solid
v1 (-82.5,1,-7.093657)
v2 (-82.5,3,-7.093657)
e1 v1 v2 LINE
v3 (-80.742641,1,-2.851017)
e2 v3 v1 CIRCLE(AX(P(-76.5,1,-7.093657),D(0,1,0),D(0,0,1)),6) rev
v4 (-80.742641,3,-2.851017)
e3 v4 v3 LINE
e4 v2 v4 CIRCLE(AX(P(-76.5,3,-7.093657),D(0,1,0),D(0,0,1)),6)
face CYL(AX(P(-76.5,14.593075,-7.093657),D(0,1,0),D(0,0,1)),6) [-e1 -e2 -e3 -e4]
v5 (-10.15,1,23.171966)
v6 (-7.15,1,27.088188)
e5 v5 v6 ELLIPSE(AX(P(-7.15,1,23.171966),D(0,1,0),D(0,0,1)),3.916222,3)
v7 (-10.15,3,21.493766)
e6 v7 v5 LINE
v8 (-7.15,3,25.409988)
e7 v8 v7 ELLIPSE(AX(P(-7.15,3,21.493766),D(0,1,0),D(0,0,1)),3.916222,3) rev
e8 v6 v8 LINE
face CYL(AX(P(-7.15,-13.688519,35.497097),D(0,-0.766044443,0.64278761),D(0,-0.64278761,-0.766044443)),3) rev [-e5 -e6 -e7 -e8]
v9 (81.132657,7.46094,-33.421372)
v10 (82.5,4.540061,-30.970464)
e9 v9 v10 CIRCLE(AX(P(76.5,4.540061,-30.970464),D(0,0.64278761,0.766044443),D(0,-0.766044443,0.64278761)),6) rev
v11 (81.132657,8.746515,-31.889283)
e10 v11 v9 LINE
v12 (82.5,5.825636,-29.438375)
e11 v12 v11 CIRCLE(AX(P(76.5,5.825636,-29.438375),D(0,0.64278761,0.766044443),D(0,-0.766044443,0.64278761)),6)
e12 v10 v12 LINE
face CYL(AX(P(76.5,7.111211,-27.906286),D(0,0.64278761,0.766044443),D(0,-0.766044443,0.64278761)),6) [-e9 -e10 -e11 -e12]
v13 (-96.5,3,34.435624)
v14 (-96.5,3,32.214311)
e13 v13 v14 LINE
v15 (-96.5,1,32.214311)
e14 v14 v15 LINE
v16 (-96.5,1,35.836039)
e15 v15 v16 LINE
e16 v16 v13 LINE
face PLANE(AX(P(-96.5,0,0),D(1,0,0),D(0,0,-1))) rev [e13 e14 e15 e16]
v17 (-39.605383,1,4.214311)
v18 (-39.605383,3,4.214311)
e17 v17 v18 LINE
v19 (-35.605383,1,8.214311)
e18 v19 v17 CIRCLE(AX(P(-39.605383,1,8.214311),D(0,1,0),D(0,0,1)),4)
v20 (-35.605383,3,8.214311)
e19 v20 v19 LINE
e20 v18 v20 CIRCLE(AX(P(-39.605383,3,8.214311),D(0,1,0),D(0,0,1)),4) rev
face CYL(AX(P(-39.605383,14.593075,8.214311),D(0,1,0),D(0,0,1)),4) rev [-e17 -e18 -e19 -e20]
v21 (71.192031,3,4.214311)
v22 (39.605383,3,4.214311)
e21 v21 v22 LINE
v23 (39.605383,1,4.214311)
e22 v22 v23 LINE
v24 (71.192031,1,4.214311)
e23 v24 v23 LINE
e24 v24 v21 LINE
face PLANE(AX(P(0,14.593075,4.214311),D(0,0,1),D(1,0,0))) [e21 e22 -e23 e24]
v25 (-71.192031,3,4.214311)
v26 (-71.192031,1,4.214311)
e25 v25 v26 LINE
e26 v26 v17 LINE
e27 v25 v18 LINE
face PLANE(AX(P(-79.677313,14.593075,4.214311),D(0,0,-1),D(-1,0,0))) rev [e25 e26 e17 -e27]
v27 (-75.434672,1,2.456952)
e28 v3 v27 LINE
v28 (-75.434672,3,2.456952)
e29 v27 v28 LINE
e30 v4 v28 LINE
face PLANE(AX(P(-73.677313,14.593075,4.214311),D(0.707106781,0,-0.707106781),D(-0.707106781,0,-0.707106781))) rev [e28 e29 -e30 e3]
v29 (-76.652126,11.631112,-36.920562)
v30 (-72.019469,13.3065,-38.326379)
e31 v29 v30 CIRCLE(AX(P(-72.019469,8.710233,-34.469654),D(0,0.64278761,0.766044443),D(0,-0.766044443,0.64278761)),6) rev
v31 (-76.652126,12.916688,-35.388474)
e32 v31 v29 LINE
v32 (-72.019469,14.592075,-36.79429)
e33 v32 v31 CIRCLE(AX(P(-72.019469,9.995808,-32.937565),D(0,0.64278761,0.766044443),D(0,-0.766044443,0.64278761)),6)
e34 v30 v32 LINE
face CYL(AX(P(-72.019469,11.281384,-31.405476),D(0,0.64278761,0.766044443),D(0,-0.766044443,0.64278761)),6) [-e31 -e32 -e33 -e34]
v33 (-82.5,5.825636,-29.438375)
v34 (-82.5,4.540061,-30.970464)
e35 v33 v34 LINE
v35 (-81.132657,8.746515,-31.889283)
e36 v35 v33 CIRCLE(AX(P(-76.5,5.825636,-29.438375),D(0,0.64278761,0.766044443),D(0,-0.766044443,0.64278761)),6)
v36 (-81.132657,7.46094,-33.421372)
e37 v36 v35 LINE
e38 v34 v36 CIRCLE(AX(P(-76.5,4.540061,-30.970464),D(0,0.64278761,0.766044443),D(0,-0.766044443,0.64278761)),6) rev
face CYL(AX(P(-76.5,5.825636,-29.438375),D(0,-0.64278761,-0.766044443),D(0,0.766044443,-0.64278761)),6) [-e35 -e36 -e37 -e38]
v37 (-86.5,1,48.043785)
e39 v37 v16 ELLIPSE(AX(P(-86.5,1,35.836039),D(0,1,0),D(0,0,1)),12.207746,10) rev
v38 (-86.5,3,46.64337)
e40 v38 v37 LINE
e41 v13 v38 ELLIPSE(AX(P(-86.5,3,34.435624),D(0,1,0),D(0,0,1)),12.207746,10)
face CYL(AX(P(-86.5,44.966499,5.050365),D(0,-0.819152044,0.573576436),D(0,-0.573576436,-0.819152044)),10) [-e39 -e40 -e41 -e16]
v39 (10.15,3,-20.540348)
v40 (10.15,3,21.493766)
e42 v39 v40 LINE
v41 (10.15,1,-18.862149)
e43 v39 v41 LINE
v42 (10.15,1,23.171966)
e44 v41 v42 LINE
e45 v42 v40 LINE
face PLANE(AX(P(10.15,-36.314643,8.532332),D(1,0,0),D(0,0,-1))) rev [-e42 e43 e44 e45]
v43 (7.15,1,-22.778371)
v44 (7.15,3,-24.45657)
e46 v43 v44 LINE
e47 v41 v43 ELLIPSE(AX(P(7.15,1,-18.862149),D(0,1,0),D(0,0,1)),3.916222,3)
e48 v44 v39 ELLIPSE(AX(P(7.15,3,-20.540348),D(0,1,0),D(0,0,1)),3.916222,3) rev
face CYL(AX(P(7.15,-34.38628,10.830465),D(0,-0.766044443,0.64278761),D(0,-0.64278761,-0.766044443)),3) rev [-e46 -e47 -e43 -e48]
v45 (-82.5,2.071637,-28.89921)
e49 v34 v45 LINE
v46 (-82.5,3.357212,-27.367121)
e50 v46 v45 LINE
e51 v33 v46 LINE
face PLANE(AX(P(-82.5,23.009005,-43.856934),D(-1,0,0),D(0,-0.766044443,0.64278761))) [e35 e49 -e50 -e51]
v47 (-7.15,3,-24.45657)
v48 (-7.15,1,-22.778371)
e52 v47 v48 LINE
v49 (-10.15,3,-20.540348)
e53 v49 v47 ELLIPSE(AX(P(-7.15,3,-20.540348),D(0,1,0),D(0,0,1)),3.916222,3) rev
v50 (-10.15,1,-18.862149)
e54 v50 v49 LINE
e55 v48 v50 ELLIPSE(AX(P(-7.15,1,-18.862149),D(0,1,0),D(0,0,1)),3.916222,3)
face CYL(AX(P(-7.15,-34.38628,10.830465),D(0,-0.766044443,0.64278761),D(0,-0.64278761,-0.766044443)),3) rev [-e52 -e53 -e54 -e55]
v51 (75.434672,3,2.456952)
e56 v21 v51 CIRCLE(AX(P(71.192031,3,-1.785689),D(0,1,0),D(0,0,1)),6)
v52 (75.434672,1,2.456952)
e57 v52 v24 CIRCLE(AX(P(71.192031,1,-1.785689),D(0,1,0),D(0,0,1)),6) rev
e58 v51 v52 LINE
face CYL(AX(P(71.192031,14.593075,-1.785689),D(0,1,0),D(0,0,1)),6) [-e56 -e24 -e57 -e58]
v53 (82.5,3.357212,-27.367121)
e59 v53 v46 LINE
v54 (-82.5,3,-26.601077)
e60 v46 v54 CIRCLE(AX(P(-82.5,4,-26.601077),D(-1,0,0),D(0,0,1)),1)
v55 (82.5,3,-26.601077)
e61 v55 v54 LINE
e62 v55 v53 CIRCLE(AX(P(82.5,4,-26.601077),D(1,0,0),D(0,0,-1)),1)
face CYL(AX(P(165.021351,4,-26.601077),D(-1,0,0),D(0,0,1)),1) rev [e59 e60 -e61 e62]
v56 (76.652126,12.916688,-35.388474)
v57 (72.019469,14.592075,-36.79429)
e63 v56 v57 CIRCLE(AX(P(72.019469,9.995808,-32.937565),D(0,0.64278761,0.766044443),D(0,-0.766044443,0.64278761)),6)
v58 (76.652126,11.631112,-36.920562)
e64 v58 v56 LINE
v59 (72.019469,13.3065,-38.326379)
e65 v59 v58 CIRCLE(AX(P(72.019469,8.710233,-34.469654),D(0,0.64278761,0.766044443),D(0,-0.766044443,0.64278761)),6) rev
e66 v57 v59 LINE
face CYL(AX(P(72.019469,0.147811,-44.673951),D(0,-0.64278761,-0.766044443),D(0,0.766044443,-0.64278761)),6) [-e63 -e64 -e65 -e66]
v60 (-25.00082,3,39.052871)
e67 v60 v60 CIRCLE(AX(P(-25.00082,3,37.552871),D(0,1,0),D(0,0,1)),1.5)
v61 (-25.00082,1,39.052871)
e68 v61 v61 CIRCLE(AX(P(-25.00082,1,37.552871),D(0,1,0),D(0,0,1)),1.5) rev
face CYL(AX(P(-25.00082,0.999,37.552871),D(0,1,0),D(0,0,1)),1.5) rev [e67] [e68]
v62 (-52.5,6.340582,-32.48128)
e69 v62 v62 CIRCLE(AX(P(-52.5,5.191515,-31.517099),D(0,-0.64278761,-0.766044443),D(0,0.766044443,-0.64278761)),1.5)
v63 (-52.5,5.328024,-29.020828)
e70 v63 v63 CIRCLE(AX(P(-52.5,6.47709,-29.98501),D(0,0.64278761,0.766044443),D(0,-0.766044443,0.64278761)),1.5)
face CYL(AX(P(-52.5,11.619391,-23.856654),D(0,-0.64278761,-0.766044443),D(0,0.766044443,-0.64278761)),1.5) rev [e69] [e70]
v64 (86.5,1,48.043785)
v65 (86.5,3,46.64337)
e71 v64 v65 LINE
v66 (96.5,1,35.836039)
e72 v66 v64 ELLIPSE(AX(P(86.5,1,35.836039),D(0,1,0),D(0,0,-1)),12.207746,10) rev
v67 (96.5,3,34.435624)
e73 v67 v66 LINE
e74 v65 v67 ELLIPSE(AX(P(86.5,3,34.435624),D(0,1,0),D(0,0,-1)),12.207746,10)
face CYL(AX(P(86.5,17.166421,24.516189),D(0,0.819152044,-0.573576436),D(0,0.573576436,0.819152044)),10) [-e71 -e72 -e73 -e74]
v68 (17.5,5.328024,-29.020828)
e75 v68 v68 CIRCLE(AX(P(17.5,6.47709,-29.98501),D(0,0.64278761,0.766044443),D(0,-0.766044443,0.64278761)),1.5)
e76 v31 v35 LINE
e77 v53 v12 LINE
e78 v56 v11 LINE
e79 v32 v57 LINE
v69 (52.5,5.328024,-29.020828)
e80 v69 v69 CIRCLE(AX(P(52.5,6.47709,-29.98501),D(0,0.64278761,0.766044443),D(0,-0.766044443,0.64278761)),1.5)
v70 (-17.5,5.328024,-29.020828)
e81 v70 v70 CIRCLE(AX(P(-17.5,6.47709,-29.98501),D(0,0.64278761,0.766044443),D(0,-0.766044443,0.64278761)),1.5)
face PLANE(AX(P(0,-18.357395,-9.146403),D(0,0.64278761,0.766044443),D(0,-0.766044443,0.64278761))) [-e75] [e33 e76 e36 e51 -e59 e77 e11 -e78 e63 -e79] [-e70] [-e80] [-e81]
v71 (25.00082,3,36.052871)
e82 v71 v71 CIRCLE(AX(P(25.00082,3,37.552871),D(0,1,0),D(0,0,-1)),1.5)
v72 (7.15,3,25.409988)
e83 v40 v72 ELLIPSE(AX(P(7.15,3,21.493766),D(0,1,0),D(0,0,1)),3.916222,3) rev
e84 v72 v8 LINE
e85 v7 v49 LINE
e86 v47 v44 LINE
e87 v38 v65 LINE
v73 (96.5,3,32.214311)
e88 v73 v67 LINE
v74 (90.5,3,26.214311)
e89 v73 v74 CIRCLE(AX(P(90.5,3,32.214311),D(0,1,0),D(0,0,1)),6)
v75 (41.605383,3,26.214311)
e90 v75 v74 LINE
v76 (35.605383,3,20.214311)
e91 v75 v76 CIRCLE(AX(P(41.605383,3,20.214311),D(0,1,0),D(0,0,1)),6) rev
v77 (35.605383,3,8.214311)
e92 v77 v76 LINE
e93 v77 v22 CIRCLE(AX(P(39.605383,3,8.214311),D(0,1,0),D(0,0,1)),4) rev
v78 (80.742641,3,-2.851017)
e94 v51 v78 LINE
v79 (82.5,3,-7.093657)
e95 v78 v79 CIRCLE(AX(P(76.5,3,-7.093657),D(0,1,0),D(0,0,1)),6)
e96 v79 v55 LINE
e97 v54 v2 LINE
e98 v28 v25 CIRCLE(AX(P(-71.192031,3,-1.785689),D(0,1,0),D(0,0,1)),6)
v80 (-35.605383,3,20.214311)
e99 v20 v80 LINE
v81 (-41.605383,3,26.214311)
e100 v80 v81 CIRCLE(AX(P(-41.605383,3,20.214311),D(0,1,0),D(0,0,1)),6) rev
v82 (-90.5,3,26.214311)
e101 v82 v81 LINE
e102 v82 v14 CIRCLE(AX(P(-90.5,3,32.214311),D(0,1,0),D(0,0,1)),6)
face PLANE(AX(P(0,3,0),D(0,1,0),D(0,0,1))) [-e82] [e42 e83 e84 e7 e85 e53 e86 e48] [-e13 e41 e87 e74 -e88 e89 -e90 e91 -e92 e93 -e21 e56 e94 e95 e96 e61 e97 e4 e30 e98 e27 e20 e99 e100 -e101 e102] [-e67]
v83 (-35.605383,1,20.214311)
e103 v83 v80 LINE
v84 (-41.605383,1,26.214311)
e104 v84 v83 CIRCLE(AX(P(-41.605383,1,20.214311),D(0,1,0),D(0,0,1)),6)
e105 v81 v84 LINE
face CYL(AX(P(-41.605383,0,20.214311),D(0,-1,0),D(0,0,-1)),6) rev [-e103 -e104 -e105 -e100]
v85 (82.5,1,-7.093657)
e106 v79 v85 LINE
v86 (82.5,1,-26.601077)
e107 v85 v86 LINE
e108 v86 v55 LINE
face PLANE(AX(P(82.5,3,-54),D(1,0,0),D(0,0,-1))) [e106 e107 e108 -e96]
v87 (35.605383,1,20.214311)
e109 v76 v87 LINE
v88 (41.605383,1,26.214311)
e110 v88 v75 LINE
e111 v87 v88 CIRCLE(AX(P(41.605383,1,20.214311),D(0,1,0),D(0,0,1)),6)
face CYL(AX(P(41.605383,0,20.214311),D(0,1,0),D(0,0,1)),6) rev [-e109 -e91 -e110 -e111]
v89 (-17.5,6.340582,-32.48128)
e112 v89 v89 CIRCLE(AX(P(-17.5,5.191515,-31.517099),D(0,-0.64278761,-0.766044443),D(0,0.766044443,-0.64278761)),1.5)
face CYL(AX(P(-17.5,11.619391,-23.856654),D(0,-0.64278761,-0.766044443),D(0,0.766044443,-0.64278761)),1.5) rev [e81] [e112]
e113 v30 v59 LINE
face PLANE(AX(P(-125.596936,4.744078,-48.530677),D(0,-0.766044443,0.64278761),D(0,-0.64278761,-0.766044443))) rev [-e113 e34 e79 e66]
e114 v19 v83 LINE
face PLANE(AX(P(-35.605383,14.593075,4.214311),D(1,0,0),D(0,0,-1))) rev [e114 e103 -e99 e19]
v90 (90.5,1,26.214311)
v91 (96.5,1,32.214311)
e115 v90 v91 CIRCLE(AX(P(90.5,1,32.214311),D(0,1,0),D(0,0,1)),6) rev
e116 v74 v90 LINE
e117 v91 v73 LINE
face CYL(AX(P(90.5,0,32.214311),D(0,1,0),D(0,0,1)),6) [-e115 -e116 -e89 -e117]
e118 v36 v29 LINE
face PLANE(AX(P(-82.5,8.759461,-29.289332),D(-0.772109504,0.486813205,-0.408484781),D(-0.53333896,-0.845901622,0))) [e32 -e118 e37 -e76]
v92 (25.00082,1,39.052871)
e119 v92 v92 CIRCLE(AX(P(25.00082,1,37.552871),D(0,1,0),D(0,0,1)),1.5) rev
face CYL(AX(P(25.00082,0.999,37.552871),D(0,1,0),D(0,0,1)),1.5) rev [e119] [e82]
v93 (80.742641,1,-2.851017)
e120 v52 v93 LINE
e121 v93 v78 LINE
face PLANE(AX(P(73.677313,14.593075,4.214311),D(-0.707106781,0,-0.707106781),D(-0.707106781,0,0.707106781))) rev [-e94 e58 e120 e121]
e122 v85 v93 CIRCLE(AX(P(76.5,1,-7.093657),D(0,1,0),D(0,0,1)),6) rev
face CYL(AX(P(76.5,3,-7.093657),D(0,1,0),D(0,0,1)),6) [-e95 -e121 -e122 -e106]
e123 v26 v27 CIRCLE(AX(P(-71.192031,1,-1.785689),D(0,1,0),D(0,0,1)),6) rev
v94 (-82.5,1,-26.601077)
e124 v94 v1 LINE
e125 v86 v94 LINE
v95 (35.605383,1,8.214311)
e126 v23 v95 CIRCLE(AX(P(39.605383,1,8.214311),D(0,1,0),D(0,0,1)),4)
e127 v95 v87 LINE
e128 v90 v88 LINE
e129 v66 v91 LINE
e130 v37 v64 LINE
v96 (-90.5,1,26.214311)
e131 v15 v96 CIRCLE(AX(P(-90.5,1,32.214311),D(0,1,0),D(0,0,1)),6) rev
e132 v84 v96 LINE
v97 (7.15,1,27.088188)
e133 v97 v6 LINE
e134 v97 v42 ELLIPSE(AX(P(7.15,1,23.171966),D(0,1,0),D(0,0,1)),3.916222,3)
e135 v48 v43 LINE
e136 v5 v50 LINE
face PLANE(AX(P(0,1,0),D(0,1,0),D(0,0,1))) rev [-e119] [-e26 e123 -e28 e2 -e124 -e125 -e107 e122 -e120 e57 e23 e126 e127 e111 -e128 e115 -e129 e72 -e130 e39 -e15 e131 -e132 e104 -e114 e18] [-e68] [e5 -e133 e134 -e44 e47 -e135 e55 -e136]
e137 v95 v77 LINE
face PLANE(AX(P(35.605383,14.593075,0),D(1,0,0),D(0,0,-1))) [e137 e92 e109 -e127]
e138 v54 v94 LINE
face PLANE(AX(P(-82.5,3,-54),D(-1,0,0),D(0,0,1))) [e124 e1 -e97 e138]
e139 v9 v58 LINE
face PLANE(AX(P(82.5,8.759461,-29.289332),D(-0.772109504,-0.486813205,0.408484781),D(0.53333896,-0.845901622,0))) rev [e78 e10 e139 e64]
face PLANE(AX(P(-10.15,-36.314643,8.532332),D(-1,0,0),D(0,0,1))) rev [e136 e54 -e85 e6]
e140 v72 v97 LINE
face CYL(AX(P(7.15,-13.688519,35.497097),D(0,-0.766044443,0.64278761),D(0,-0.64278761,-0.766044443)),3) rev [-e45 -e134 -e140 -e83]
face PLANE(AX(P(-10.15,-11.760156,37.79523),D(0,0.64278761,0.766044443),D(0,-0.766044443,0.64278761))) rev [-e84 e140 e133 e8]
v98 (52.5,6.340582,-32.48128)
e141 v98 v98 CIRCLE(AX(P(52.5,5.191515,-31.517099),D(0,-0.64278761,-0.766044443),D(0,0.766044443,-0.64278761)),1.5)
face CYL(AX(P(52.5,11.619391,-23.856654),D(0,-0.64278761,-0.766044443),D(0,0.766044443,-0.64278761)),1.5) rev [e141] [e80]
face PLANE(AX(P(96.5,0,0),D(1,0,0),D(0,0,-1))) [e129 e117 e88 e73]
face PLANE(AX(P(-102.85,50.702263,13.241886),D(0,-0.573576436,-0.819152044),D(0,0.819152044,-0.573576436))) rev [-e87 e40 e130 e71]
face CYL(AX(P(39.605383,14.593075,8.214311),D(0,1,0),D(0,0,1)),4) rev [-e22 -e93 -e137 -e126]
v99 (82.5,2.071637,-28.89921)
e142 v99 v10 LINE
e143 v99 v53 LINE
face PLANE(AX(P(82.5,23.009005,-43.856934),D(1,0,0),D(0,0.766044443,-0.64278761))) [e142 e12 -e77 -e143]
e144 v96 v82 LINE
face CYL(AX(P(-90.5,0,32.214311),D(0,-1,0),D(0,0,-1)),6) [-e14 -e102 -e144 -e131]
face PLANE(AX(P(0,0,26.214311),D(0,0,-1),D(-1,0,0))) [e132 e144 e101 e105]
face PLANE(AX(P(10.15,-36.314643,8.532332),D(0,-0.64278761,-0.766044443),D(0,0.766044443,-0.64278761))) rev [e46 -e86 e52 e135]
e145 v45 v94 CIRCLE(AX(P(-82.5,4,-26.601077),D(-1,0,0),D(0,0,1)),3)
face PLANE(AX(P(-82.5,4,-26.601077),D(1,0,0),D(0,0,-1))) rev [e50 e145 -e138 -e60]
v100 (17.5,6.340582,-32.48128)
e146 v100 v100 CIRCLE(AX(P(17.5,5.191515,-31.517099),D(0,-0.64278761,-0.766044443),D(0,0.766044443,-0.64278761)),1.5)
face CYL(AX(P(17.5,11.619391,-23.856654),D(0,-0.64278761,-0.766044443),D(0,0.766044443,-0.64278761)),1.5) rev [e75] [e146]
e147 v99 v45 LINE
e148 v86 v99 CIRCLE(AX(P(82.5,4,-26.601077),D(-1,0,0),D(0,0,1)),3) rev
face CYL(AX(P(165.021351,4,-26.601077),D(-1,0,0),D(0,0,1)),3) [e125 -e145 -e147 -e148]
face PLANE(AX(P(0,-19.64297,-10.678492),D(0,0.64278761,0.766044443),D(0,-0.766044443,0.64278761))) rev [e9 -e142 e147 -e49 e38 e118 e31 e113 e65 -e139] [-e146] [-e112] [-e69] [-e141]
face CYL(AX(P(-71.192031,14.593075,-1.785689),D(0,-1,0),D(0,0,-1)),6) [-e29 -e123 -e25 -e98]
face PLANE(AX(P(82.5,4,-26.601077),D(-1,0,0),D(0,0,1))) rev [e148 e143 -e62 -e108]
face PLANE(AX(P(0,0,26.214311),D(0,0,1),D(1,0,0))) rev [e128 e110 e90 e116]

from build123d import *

# Parameters (mm, degrees)
SKETCH_1_W              = 165
SKETCH_1_H              = 108
EXTRUDE_1_DEPTH         = 3
SHEET_METAL_2_OUTLINE_W = 165
SHEET_METAL_2_OUTLINE_H = 108
SHEET_METAL_2_DEPTH     = 1
OTHER_START             = -82.5
OTHER_1_DEPTH           = 165
OTHER_1_2_DEPTH         = 165
SKETCH_14_W             = 50
SKETCH_14_H             = 35
CUT_EXTRUDE_1_DEPTH     = 2
FILLET_1_R              = 5
SKETCH_20_R             = 1.75
CUT_EXTRUDE_7_DEPTH     = 10
SKETCH_24_W             = 165
SKETCH_24_H             = 1
CUT_EXTRUDE_11_DEPTH    = 10
SKETCH_25_W             = 17
SKETCH_25_H             = 2
EXTRUDE_2_DEPTH         = 14
SKETCH_26_W             = 17
SKETCH_26_H             = 2
EXTRUDE_3_DEPTH         = 14
FILLET_6_R              = 10
SKETCH_27_R             = 2.25
CUT_EXTRUDE_12_DEPTH    = 10
SKETCH_28_R             = 1.75
CUT_EXTRUDE_13_DEPTH    = 113.27486947
SKETCH_29_W             = 15
SKETCH_29_H             = 12
CUT_EXTRUDE_14_DEPTH    = 10
FILLET_8_R              = 3
OTHER_START_2           = 3
OTHER_1_3_DEPTH         = 21
OTHER_START_3           = 1
OTHER_1_3_2_OUTLINE_R   = 1.75
OTHER_1_3_2_DEPTH       = 2
OTHER_START_4           = -42
OTHER_1_4_OUTLINE_R     = 1.75
OTHER_1_4_DEPTH         = 10.030896321
OTHER_1_4_2_DEPTH       = 165
OTHER_START_5           = -67.5
OTHER_1_4_3_DEPTH       = 135
OTHER_1_4_4_DEPTH       = 165
OTHER_START_6           = -20.806456798
OTHER_1_4_5_OUTLINE_R   = 1.75
OTHER_1_4_5_DEPTH       = 2
CUT_EXTRUDE_20_DEPTH    = 10
FILLET_9_R              = 3
EXTRUDE_4_DEPTH         = 2
EXTRUDE_5_DEPTH         = 2
CUT_EXTRUDE_21_REACH    = 133.427
SKETCH_34_W             = 20.3
SKETCH_34_H             = 38.2
SKETCH_38_R             = 2.25
SKETCH_38_R_2           = 1.75
EXTRUDE_6_DEPTH         = 2
CUT_EXTRUDE_23_DEPTH    = 10
EXTRUDE_START           = -2
SKETCH_47_R             = 1.75
EXTRUDE_9_DEPTH         = 2
CUT_EXTRUDE_27_DEPTH    = 10
FILLET_14_R             = 3.3
FILLET_17_R             = 3
SKETCH_51_W             = 12.822687145
SKETCH_51_H             = 2
EXTRUDE_12_DEPTH        = 24
SKETCH_56_W             = 8.820712464
SKETCH_56_H             = 2.159181397
SKETCH_56_W_2           = 10.112203134
EXTRUDE_13_DEPTH        = 2
SKETCH_55_W             = 243.511424265
SKETCH_55_H             = 14.236732763
CUT_EXTRUDE_29_DEPTH    = 123.832146316
CUT_EXTRUDE_30_REACH    = 112.932
SKETCH_58_W             = 44.071930239
SKETCH_58_H             = 30
CUT_EXTRUDE_33_REACH    = 119.8
SKETCH_62_W             = 205
SKETCH_62_H             = 60.625088721
FILLET_18_R             = 4
SKETCH_63_R             = 1.5
CUT_EXTRUDE_34_DEPTH    = 10
CUT_EXTRUDE_35_REACH    = 110.652
EXTRUDE_16_DEPTH        = 8
EXTRUDE_16_DEPTH_BACK   = 5
FILLET_23_R             = 6
FILLET_25_R             = 6
CUT_EXTRUDE_36_DEPTH    = 4
FILLET_26_R             = 6
FILLET_27_R             = 10
CUT_EXTRUDE_38_REACH    = 110.42
SKETCH_72_R             = 1.5


with BuildPart() as part:
    # 草图1 → 凸台-拉伸1 (new body)
    with BuildSketch(Plane(origin=(0, 0, 0), x_dir=(1, 0, 0), z_dir=(0, 1, 0))):
        Rectangle(SKETCH_1_W, SKETCH_1_H)
    extrude(amount=EXTRUDE_1_DEPTH)

    # Sheet Metal 2: read off the stored shape, not the designer's step
    # Sheet Metal 2 outline → Sheet Metal 2 (cut)
    with BuildSketch(Plane(origin=(0, 0, 0), x_dir=(1, 0, 0), z_dir=(0, 1, 0))):
        Rectangle(SHEET_METAL_2_OUTLINE_W, SHEET_METAL_2_OUTLINE_H)
    extrude(amount=SHEET_METAL_2_DEPTH, mode=Mode.SUBTRACT)

    # Other 1: read off the stored shape, not the designer's step
    # Other 1 outline → Other 1 (cut)
    with BuildSketch(Plane.YZ.offset(OTHER_START)):
        with BuildLine():
            Line((3, -54), (3, -29.678199262))
            Line((3, -29.678199262), (2.071637171, -28.899210355))
            ThreePointArc((2.071637171, -28.899210355), (1.281076639, -27.868931811), (1, -26.601077026))
            Line((1, -26.601077026), (1, -54))
            Line((1, -54), (3, -54))
        make_face()
    extrude(amount=OTHER_1_DEPTH, mode=Mode.SUBTRACT)

    # Other 1 2 outline → Other 1 2 (add)
    with BuildSketch(Plane.YZ.offset(OTHER_START)):
        with BuildLine():
            Line((3, -29.678199262), (21.723430088, -45.389022544))
            Line((21.723430088, -45.389022544), (23.009005307, -43.856933657))
            Line((23.009005307, -43.856933657), (3.35721239, -27.367121469))
            ThreePointArc((3.35721239, -27.367121469), (3.093692213, -27.023695287), (3, -26.601077026))
            Line((3, -26.601077026), (3, -29.678199262))
        make_face()
    extrude(amount=OTHER_1_2_DEPTH)

    # 草图14 → 切除-拉伸1 (cut)
    with BuildSketch(Plane.XZ.offset(-1)):
        with Locations((35, -1.601077026)):
            Rectangle(SKETCH_14_W, SKETCH_14_H)
        with Locations((-35, -1.601077026)):
            Rectangle(SKETCH_14_W, SKETCH_14_H)
    extrude(amount=-CUT_EXTRUDE_1_DEPTH, mode=Mode.SUBTRACT)

    # 圆角1
    fillet_1_edges = [part.edges().sort_by_distance(p)[0] for p in [
        (60, 2, 15.898922974),
        (60, 2, -19.101077026),
        (10, 2, -19.101077026),
        (10, 2, 15.898922974),
        (-10, 2, 15.898922974),
        (-10, 2, -19.101077026),
        (-60, 2, -19.101077026),
        (-60, 2, 15.898922974),
    ]]
    fillet(fillet_1_edges, radius=FILLET_1_R)

    # 草图20 → 切除-拉伸7 (cut)
    with BuildSketch(Plane(origin=(0, -12.088557412, -14.406581725), x_dir=(1, 0, 0), z_dir=(0, 0.6427876096865379, 0.7660444431189792))):
        with Locations(Location((-17.5, 37.816614211, 0), (0, 0, 270))):
            Circle(SKETCH_20_R)
        with Locations(Location((-52.5, 37.816614211, 0), (0, 0, 270))):
            Circle(SKETCH_20_R)
        with Locations(Location((17.5, 37.816614211, 0), (0, 0, 270))):
            Circle(SKETCH_20_R)
        with Locations(Location((52.5, 37.816614211, 0), (0, 0, 270))):
            Circle(SKETCH_20_R)
    extrude(amount=-CUT_EXTRUDE_7_DEPTH, mode=Mode.SUBTRACT)

    # 草图24 → 切除-拉伸11 (cut)
    with BuildSketch(Plane(origin=(0, 3, 0), x_dir=(1, 0, 0), z_dir=(0, 1, 0))):
        with Locations((0, -53.5)):
            Rectangle(SKETCH_24_W, SKETCH_24_H)
    extrude(amount=-CUT_EXTRUDE_11_DEPTH, mode=Mode.SUBTRACT)

    # 草图25 → 凸台-拉伸2 (add)
    with BuildSketch(Plane.ZY.offset(82.5)):
        with Locations((44.5, 2)):
            Rectangle(SKETCH_25_W, SKETCH_25_H)
    extrude(amount=EXTRUDE_2_DEPTH)

    # 草图26 → 凸台-拉伸3 (add)
    with BuildSketch(Plane(origin=(82.5, 0, 0), x_dir=(0, 0, -1), z_dir=(1, 0, 0))):
        with Locations((-44.5, 2)):
            Rectangle(SKETCH_26_W, SKETCH_26_H)
    extrude(amount=EXTRUDE_3_DEPTH)

    # 圆角6
    fillet_6_edges = [part.edges().sort_by_distance(p)[0] for p in [
        (-82.5, 2, 36),
        (82.5, 2, 36),
    ]]
    fillet(fillet_6_edges, radius=FILLET_6_R)

    # 草图27 → 切除-拉伸12 (cut)
    with BuildSketch(Plane(origin=(0, 3, 0), x_dir=(1, 0, 0), z_dir=(0, 1, 0))):
        with Locations(Location((-73.3, -43.8, 0), (0, 0, 270))):
            Circle(SKETCH_27_R)
        with Locations(Location((73.3, -43.8, 0), (0, 0, 270))):
            Circle(SKETCH_27_R)
    extrude(amount=-CUT_EXTRUDE_12_DEPTH, mode=Mode.SUBTRACT)

    # 草图28 → 切除-拉伸13 (cut, through all)
    with BuildSketch(Plane.XZ.offset(-1)):
        with Locations(Location((-70.5, 8.898922974, 0), (0, 0, 270))):
            Circle(SKETCH_28_R)
        with Locations(Location((70.5, 8.898922974, 0), (0, 0, 270))):
            Circle(SKETCH_28_R)
    extrude(amount=-CUT_EXTRUDE_13_DEPTH, mode=Mode.SUBTRACT)

    # 草图29 → 切除-拉伸14 (cut)
    with BuildSketch(Plane(origin=(0, -12.088557412, -14.406581725), x_dir=(1, 0, 0), z_dir=(0, 0.6427876096865379, 0.7660444431189792))):
        with Locations((-75, 39.816614211)):
            Rectangle(SKETCH_29_W, SKETCH_29_H)
        with Locations((75, 39.816614211)):
            Rectangle(SKETCH_29_W, SKETCH_29_H)
    extrude(amount=-CUT_EXTRUDE_14_DEPTH, mode=Mode.SUBTRACT)

    # 圆角8
    fillet_8_edges = [part.edges().sort_by_distance(p)[0] for p in [
        (-96.5, 2, 53),
        (-96.5, 2, 36),
        (96.5, 2, 53),
        (96.5, 2, 36),
    ]]
    fillet(fillet_8_edges, radius=FILLET_8_R)

    # Other 1 3: read off the stored shape, not the designer's step
    # Other 1 3 outline → Other 1 3 (cut)
    with BuildSketch(Plane(origin=(0, 0, 0), x_dir=(1, 0, 0), z_dir=(0, 1, 0)).offset(OTHER_START_2)):
        Polygon((-67.5, 42), (-82.5, 42), (-82.5, 25), (82.5, 25), (82.5, 42), (67.5, 42), (67.5, 54), (-67.5, 54), align=None)
    extrude(amount=OTHER_1_3_DEPTH, mode=Mode.SUBTRACT)

    # Other 1 3 2 outline → Other 1 3 2 (add)
    with BuildSketch(Plane(origin=(0, 0, 0), x_dir=(1, 0, 0), z_dir=(0, 1, 0)).offset(OTHER_START_3)):
        Polygon((-67.5, 42), (-82.5, 42), (-82.5, 25), (82.5, 25), (82.5, 42), (67.5, 42), (67.5, 54), (-67.5, 54), align=None)
        with Locations((17.5, 46)):
            Circle(OTHER_1_3_2_OUTLINE_R, mode=Mode.SUBTRACT)
        with Locations((52.5, 46)):
            Circle(OTHER_1_3_2_OUTLINE_R, mode=Mode.SUBTRACT)
        with Locations((-52.5, 46)):
            Circle(OTHER_1_3_2_OUTLINE_R, mode=Mode.SUBTRACT)
        with Locations((-17.5, 46)):
            Circle(OTHER_1_3_2_OUTLINE_R, mode=Mode.SUBTRACT)
    extrude(amount=OTHER_1_3_2_DEPTH)

    # Other 1 4: read off the stored shape, not the designer's step
    # Other 1 4 outline → Other 1 4 (cut)
    with BuildSketch(Plane(origin=(0, 0, 0), x_dir=(1, 0, 0), z_dir=(0, 0.6427876096865381, 0.7660444431189791)).offset(OTHER_START_4)):
        with Locations((-17.5, 37.816614211)):
            Circle(OTHER_1_4_OUTLINE_R)
        with Locations((-52.5, 37.816614211)):
            Circle(OTHER_1_4_OUTLINE_R)
        with Locations((17.5, 37.816614211)):
            Circle(OTHER_1_4_OUTLINE_R)
        with Locations((52.5, 37.816614211)):
            Circle(OTHER_1_4_OUTLINE_R)
    extrude(amount=OTHER_1_4_DEPTH, mode=Mode.SUBTRACT)

    # Other 1 4 2 outline → Other 1 4 2 (cut)
    with BuildSketch(Plane.YZ.offset(OTHER_START)):
        with BuildLine():
            Line((3, -29.678199262), (2.071637171, -28.899210355))
            ThreePointArc((2.071637171, -28.899210355), (1.281076639, -27.868931811), (1, -26.601077026))
            Line((1, -26.601077026), (1, -54))
            Line((1, -54), (3, -54))
            Line((3, -54), (3, -29.678199262))
        make_face()
    extrude(amount=OTHER_1_4_2_DEPTH, mode=Mode.SUBTRACT)

    # Other 1 4 3 outline → Other 1 4 3 (add)
    with BuildSketch(Plane.YZ.offset(OTHER_START_5)):
        with BuildLine():
            Line((21.723430088, -45.389022544), (23.009005307, -43.856933657))
            Line((23.009005307, -43.856933657), (3.35721239, -27.367121469))
            ThreePointArc((3.35721239, -27.367121469), (3.093692213, -27.023695287), (3, -26.601077026))
            Line((3, -26.601077026), (3, -29.678199262))
            Line((3, -29.678199262), (21.723430088, -45.389022544))
        make_face()
    extrude(amount=OTHER_1_4_3_DEPTH)

    # Other 1 4 4 outline → Other 1 4 4 (add)
    with BuildSketch(Plane.YZ.offset(OTHER_START)):
        with BuildLine():
            Line((3, -29.678199262), (12.530896771, -37.675571228))
            Line((12.530896771, -37.675571228), (13.81647199, -36.143482341))
            Line((13.81647199, -36.143482341), (3.35721239, -27.367121469))
            ThreePointArc((3.35721239, -27.367121469), (3.093692213, -27.023695287), (3, -26.601077026))
            Line((3, -26.601077026), (3, -29.678199262))
        make_face()
    extrude(amount=OTHER_1_4_4_DEPTH)

    # Other 1 4 5 outline → Other 1 4 5 (cut)
    with BuildSketch(Plane(origin=(0, 0, 0), x_dir=(1, 0, 0), z_dir=(0, 0.6427876096865381, 0.7660444431189791)).offset(OTHER_START_6)):
        with Locations((-17.5, 37.816614211)):
            Circle(OTHER_1_4_5_OUTLINE_R)
        with Locations((-52.5, 37.816614211)):
            Circle(OTHER_1_4_5_OUTLINE_R)
        with Locations((17.5, 37.816614211)):
            Circle(OTHER_1_4_5_OUTLINE_R)
        with Locations((52.5, 37.816614211)):
            Circle(OTHER_1_4_5_OUTLINE_R)
    extrude(amount=OTHER_1_4_5_DEPTH, mode=Mode.SUBTRACT)

    # 草图31 → 切除-拉伸20 (cut)
    with BuildSketch(Plane(origin=(0, -12.088557412, -14.406581725), x_dir=(1, 0, 0), z_dir=(0, 0.6427876096865379, 0.7660444431189792))):
        Polygon((0, 45.816614211), (8, 45.816614211), (8, 39.795572536), (-8, 39.795572536), (-8, 45.816614211), align=None)
    extrude(amount=-CUT_EXTRUDE_20_DEPTH, mode=Mode.SUBTRACT)

    # 圆角9
    fillet_9_edges = [part.edges().sort_by_distance(p)[0] for p in [
        (8, 17.753832181, -40.752727114),
        (-8, 17.753832181, -40.752727114),
    ]]
    fillet(fillet_9_edges, radius=FILLET_9_R)

    # 草图32 → 凸台-拉伸4 (add)
    with BuildSketch(Plane(origin=(0, 3, 0), x_dir=(1, 0, 0), z_dir=(0, 1, 0))):
        with BuildLine():
            Line((55, -15.898922974), (15, -15.898922974))
            ThreePointArc((15, -15.898922974), (11.464466094, -14.43445688), (10, -10.898922974))
            Line((10, -10.898922974), (10, 14.101077026))
            ThreePointArc((10, 14.101077026), (11.464466094, 17.636610931), (15, 19.101077026))
            Line((15, 19.101077026), (55, 19.101077026))
            ThreePointArc((55, 19.101077026), (58.535533906, 17.636610931), (60, 14.101077026))
            Line((60, 14.101077026), (60, -10.898922974))
            ThreePointArc((60, -10.898922974), (58.535533906, -14.43445688), (55, -15.898922974))
        make_face()
    extrude(amount=-EXTRUDE_4_DEPTH)

    # 草图33 → 凸台-拉伸5 (add)
    with BuildSketch(Plane(origin=(0, 3, 0), x_dir=(1, 0, 0), z_dir=(0, 1, 0))):
        with BuildLine():
            Line((-55, 19.101077026), (-15, 19.101077026))
            ThreePointArc((-15, 19.101077026), (-11.464466094, 17.636610931), (-10, 14.101077026))
            Line((-10, 14.101077026), (-10, -10.898922974))
            ThreePointArc((-10, -10.898922974), (-11.464466094, -14.43445688), (-15, -15.898922974))
            Line((-15, -15.898922974), (-55, -15.898922974))
            ThreePointArc((-55, -15.898922974), (-58.535533906, -14.43445688), (-60, -10.898922974))
            Line((-60, -10.898922974), (-60, 14.101077026))
            ThreePointArc((-60, 14.101077026), (-58.535533906, 17.636610931), (-55, 19.101077026))
        make_face()
    extrude(amount=-EXTRUDE_5_DEPTH)

    # 切除-拉伸21: up to this plane
    cut_extrude_21_end = Plane(origin=(0, 1, 0), z_dir=(0, 1, 0))
    # 草图34 → 切除-拉伸21 (cut, up to the surface)
    with BuildSketch(Plane(origin=(0, 35.097562719, -29.450351933), x_dir=(1, 0, 0), z_dir=(0, 0.7660444431189792, -0.6427876096865379)), mode=Mode.PRIVATE) as cut_extrude_21_sk1:
        with Locations((0, -2.293543202)):
            Rectangle(SKETCH_34_W, SKETCH_34_H)
    cut_extrude_21_tool1 = split(extrude(cut_extrude_21_sk1.sketch, amount=-CUT_EXTRUDE_21_REACH, mode=Mode.PRIVATE), bisect_by=cut_extrude_21_end, keep=Keep.BOTH, mode=Mode.PRIVATE)
    add(cut_extrude_21_tool1.solids().sort_by_distance((0, 36.571824, -27.693396))[0], mode=Mode.SUBTRACT)

    # 草图38 → 凸台-拉伸6 (add)
    with BuildSketch(Plane.XZ.offset(-1)):
        with Locations((-73.3, 43.8)):
            Circle(SKETCH_38_R)
        with Locations((-70.5, 8.898922974)):
            Circle(SKETCH_38_R_2)
        with Locations((70.5, 8.898922974)):
            Circle(SKETCH_38_R_2)
        with Locations((73.3, 43.8)):
            Circle(SKETCH_38_R)
    extrude(amount=-EXTRUDE_6_DEPTH)

    # 草图41 → 切除-拉伸23 (cut)
    with BuildSketch(Plane.XZ.offset(-1)):
        Polygon((-79.183967725, 34.214311054), (-56.85462571, 34.214311054), (-56.85462571, 14.214311054), (-78.010881611, 14.214311054), (-82.5, 14.214311054), (-86.796922418, 34.214311054), align=None)
        Polygon((86.796922418, 34.214311054), (82.5, 14.214311054), (78.010881611, 14.214311054), (56.85462571, 14.214311054), (56.85462571, 34.214311054), (79.183967725, 34.214311054), align=None)
    extrude(amount=-CUT_EXTRUDE_23_DEPTH, mode=Mode.SUBTRACT)

    # 草图47 → 凸台-拉伸9 (add)
    with BuildSketch(Plane(origin=(0, -12.088557412, -14.406581725), x_dir=(1, 0, 0), z_dir=(0, 0.6427876096865379, 0.7660444431189792)).offset(EXTRUDE_START)):
        with Locations((-52.5, 37.816614211)):
            Circle(SKETCH_47_R)
        with Locations((-17.5, 38.795572536)):
            Circle(SKETCH_47_R)
        with Locations((17.5, 37.816614211)):
            Circle(SKETCH_47_R)
        with Locations((52.5, 37.816614211)):
            Circle(SKETCH_47_R)
    extrude(amount=EXTRUDE_9_DEPTH)

    # 草图50 → 切除-拉伸27 (cut)
    with BuildSketch(Plane(origin=(0, 3, 0), x_dir=(1, 0, 0), z_dir=(0, 1, 0))):
        Polygon((-69.677312855, -14.214311054), (-82.5, -1.391623909), (-82.5, -14.214311054), align=None)
    cut_extrude_27 = extrude(amount=-CUT_EXTRUDE_27_DEPTH, mode=Mode.SUBTRACT)

    # 圆角14
    fillet_14_edges = [part.edges().sort_by_distance(p)[0] for p in [
        (-82.5, 2, 1.391623909),
    ]]
    fillet(fillet_14_edges, radius=FILLET_14_R)

    # 镜向3: 切除-拉伸27 across plane
    add(cut_extrude_27.mirror(Plane(origin=(0, 0, 0), x_dir=(0, 0, 1), z_dir=(1, 0, 0))), mode=Mode.SUBTRACT)

    # 圆角17
    fillet_17_edges = [part.edges().sort_by_distance(p)[0] for p in [
        (-10.15, 2, 26.249087979),
        (-10.15, 2, -23.617470474),
        (10.15, 2, -23.617470474),
        (10.15, 2, 26.249087979),
    ]]
    fillet(fillet_17_edges, radius=FILLET_17_R)

    # 草图51 → 凸台-拉伸12 (add)
    with BuildSketch(Plane.XY.offset(14.214311054)):
        with Locations((-63.265969283, 2)):
            Rectangle(SKETCH_51_W, SKETCH_51_H)
    extrude_12 = extrude(amount=EXTRUDE_12_DEPTH)

    # 镜向4: 凸台-拉伸12 across plane
    add(extrude_12.mirror(Plane(origin=(0, 0, 0), x_dir=(0, 0, 1), z_dir=(1, 0, 0))))

    # 草图56 → 凸台-拉伸13 (add)
    with BuildSketch(Plane(origin=(0, -12.088557412, -14.406581725), x_dir=(1, 0, 0), z_dir=(0, 0.6427876096865379, 0.7660444431189792))):
        with Locations((-71.910356232, 34.896204909)):
            Rectangle(SKETCH_56_W, SKETCH_56_H)
        with Locations((72.556101567, 34.896204909)):
            Rectangle(SKETCH_56_W_2, SKETCH_56_H)
    extrude(amount=-EXTRUDE_13_DEPTH)

    # 草图55 → 切除-拉伸29 (cut, through all)
    with BuildSketch(Plane(origin=(0, -12.088557412, -14.406581725), x_dir=(1, 0, 0), z_dir=(0, 0.6427876096865379, 0.7660444431189792))):
        with Locations((-3.841223904, 41.947458337)):
            Rectangle(SKETCH_55_W, SKETCH_55_H)
    extrude(amount=-CUT_EXTRUDE_29_DEPTH, mode=Mode.SUBTRACT)

    # 草图58 → 切除-拉伸30 (cut, up to next)
    with BuildSketch(Plane.XZ.offset(-1), mode=Mode.PRIVATE) as cut_extrude_30_sk1:
        Polygon((35.605382616, 4.214311054), (79.677312855, 4.214311054), (69.677312855, 14.214311054), (69.677312855, 34.214311054), (35.605382616, 34.214311054), align=None)
    cut_extrude_30_tool1 = extrude(cut_extrude_30_sk1.sketch, amount=-CUT_EXTRUDE_30_REACH, mode=Mode.PRIVATE) & part.part
    # 草图58 → 切除-拉伸30 (cut, up to next)
    with BuildSketch(Plane.XZ.offset(-1), mode=Mode.PRIVATE) as cut_extrude_30_sk2:
        with Locations((-57.641347736, 19.214311054)):
            Rectangle(SKETCH_58_W, SKETCH_58_H)
    cut_extrude_30_tool2 = extrude(cut_extrude_30_sk2.sketch, amount=-CUT_EXTRUDE_30_REACH, mode=Mode.PRIVATE) & part.part
    add(cut_extrude_30_tool1.solids().sort_by_distance((53.591268, 1, 18.670237))[0], mode=Mode.SUBTRACT)
    add(cut_extrude_30_tool2.solids().sort_by_distance((-57.641348, 1, 19.214311))[0], mode=Mode.SUBTRACT)

    # 草图62 → 切除-拉伸33 (cut, up to next)
    with BuildSketch(Plane(origin=(0, -24.230844379, 16.966619891), x_dir=(-1, 0, 0), z_dir=(0, -0.819152044288991, 0.5735764363510473)), mode=Mode.PRIVATE) as cut_extrude_33_sk1:
        with Locations((0.35, -70.241285348)):
            Rectangle(SKETCH_62_W, SKETCH_62_H)
    cut_extrude_33_tool1 = extrude(cut_extrude_33_sk1.sketch, amount=-CUT_EXTRUDE_33_REACH, mode=Mode.PRIVATE) & part.part
    add(cut_extrude_33_tool1.solids().sort_by_distance((-0.35, 16.057902, 74.504912))[0], mode=Mode.SUBTRACT)

    # 圆角18
    fillet_18_edges = [part.edges().sort_by_distance(p)[0] for p in [
        (35.605382616, 2, 34.214311054),
        (-35.605382616, 2, 34.214311054),
        (-35.605382616, 2, 4.214311054),
        (35.605382616, 2, 4.214311054),
    ]]
    fillet(fillet_18_edges, radius=FILLET_18_R)

    # 草图63 → 切除-拉伸34 (cut)
    with BuildSketch(Plane(origin=(0, -13.374132631, -15.938670611), x_dir=(-1, 0, 0), z_dir=(0, -0.6427876096865379, -0.7660444431189792))):
        with Locations(Location((-52.5, 24.235731917, 0), (0, 0, 90))):
            Circle(SKETCH_63_R)
        with Locations(Location((-17.5, 24.235731917, 0), (0, 0, 90))):
            Circle(SKETCH_63_R)
        with Locations(Location((17.5, 24.235731917, 0), (0, 0, 90))):
            Circle(SKETCH_63_R)
        with Locations(Location((52.5, 24.235731917, 0), (0, 0, 90))):
            Circle(SKETCH_63_R)
    extrude(amount=-CUT_EXTRUDE_34_DEPTH, mode=Mode.SUBTRACT)

    # 草图64 → 切除-拉伸35 (cut, up to next)
    with BuildSketch(Plane.XZ.offset(-1), mode=Mode.PRIVATE) as cut_extrude_35_sk1:
        Polygon((73.677312855, 4.214311054), (82.5, -4.608376091), (82.5, 4.214311054), align=None)
    cut_extrude_35_tool1 = extrude(cut_extrude_35_sk1.sketch, amount=-CUT_EXTRUDE_35_REACH, mode=Mode.PRIVATE) & part.part
    # 草图64 → 切除-拉伸35 (cut, up to next)
    with BuildSketch(Plane.XZ.offset(-1), mode=Mode.PRIVATE) as cut_extrude_35_sk2:
        Polygon((-73.677312855, 4.214311054), (-82.5, -4.608376091), (-82.5, 4.214311054), align=None)
    cut_extrude_35_tool2 = extrude(cut_extrude_35_sk2.sketch, amount=-CUT_EXTRUDE_35_REACH, mode=Mode.PRIVATE) & part.part
    add(cut_extrude_35_tool1.solids().sort_by_distance((79.559104, 1, 1.273415))[0], mode=Mode.SUBTRACT)
    add(cut_extrude_35_tool2.solids().sort_by_distance((-79.559104, 1, 1.273415))[0], mode=Mode.SUBTRACT)

    # 草图67 → 凸台-拉伸16 (add, two sides: drawn at the far end of the back side and taken through both)
    with BuildSketch(Plane(origin=(0, 0, 34.214311054), x_dir=(-1, 0, 0), z_dir=(0, 0, -1)).offset(-EXTRUDE_16_DEPTH_BACK)):
        Polygon((-93.5, 3), (-92.5, 3), (-86.796922418, 3), (-69.677312855, 3), (-39.605382616, 3), (-35.605382616, 3), (-35.605382616, 1), (-39.605382616, 1), (-69.677312855, 1), (-86.796922418, 1), (-92.5, 1), (-93.5, 1), (-96.5, 1), (-96.5, 3), align=None)
        Polygon((69.677312855, 3), (39.605382616, 3), (35.605382616, 3), (35.605382616, 1), (39.605382616, 1), (69.677312855, 1), (86.796922418, 1), (92.5, 1), (93.5, 1), (96.5, 1), (96.5, 3), (93.5, 3), (92.5, 3), (86.796922418, 3), align=None)
    extrude(amount=EXTRUDE_16_DEPTH + EXTRUDE_16_DEPTH_BACK)

    # 圆角23
    fillet_23_edges = [part.edges().sort_by_distance(p)[0] for p in [
        (-35.605382616, 2, 26.214311054),
        (-96.5, 2, 26.214311054),
        (96.5, 2, 26.214311054),
        (35.605382616, 2, 26.214311054),
    ]]
    fillet(fillet_23_edges, radius=FILLET_23_R)

    # 圆角25
    # the kernel refuses this fillet: 6 mm, written as the material it adds along each edge
    with BuildSketch(Plane(origin=(-76.320712464, 13.81647199, -36.143482341), x_dir=(-1.0, 8.907019491368926e-11, -7.473874667401355e-11), z_dir=(0, -0.6427876096865379, -0.7660444431189792))) as fillet_25_piece_1:
        with BuildLine():
            CenterArc((3.335359313, 6), FILLET_25_R, 236.227740467, 33.772259527)
            Line((0, 1.012477744), (0, 0))
            Line((0, 0), (3.335359312, 0))
        make_face()
    extrude(amount=2)
    # the kernel refuses this fillet: 6 mm, written as the material it takes off along each edge
    with BuildSketch(Plane(origin=(82.5, -5.213203436, -4.608376091), x_dir=(0, 0, -1), z_dir=(0, 1, 0)), Plane(origin=(73.677312855, -5.213203436, 4.214311054), x_dir=(0.707106781186546, 0, -0.7071067811865489), z_dir=(0, 1, 0)), Plane(origin=(-82.5, -5.213203436, -4.608376091), x_dir=(0.7071067811865464, 0, 0.7071067811865486), z_dir=(0, 1, 0)), Plane(origin=(-73.677312855, -5.213203436, 4.214311054), x_dir=(1, 0, 0), z_dir=(0, 1, 0))) as fillet_25_2_piece_1:
        with BuildLine():
            CenterArc((FILLET_25_R * 0.414213562373, FILLET_25_R), FILLET_25_R, 225, 45)
            Line((-FILLET_25_R * 0.292893218813, FILLET_25_R * 0.292893218813), (0, 0))
            Line((0, 0), (FILLET_25_R * 0.414213562373, 0))
        make_face()
    extrude(amount=14.426406871, mode=Mode.SUBTRACT)

    # 草图69 → 切除-拉伸36 (cut)
    with BuildSketch(Plane(origin=(0, -13.374132631, -15.938670611), x_dir=(-1, 0, 0), z_dir=(0, -0.6427876096865379, -0.7660444431189792))):
        Polygon((-82.5, 25.536955804), (-74.852049824, 34.829091955), (-83.09997169, 34.829091955), align=None)
        Polygon((83.09997169, 34.829091955), (82.5, 25.536955804), (74.852049824, 34.829091955), align=None)
    extrude(amount=-CUT_EXTRUDE_36_DEPTH, mode=Mode.SUBTRACT)

    # 圆角26
    fillet_26_edges = [part.edges().sort_by_distance(p)[0] for p in [
        (74.852049824, 13.94928733, -37.560334933),
        (82.5, 6.831098067, -31.587464948),
        (-74.852049824, 13.94928733, -37.560334933),
        (-82.5, 6.831098067, -31.587464948),
    ]]
    fillet(fillet_26_edges, radius=FILLET_26_R)

    # 圆角27
    # the kernel refuses this fillet: 10 mm, written as the material it takes off along each edge
    with BuildSketch(Plane(origin=(96.5, -19.478801107, 62.383195729), x_dir=(-1, 0, 0), z_dir=(0, 0.819152044288991, -0.5735764363510473)), Plane(origin=(-96.5, -19.478801107, 62.383195729), x_dir=(0, -0.5735764363510473, -0.819152044288991), z_dir=(0, 0.819152044288991, -0.5735764363510473))) as fillet_27_piece_1:
        with BuildLine():
            CenterArc((FILLET_27_R, -FILLET_27_R), FILLET_27_R, 90, 90)
            Line((0, -FILLET_27_R), (0, 0))
            Line((0, 0), (FILLET_27_R, 0))
        make_face()
    extrude(amount=52.441549178, mode=Mode.SUBTRACT)

    # 草图72 → 切除-拉伸38 (cut, up to next)
    with BuildSketch(Plane(origin=(0, 3, 0), x_dir=(1, 0, 0), z_dir=(0, 1, 0)), mode=Mode.PRIVATE) as cut_extrude_38_sk1:
        with Locations(Location((-25.000820268, -37.552871048, 0), (0, 0, 270))):
            Circle(SKETCH_72_R)
    cut_extrude_38_tool1 = extrude(cut_extrude_38_sk1.sketch, amount=-CUT_EXTRUDE_38_REACH, mode=Mode.PRIVATE) & part.part
    # 草图72 → 切除-拉伸38 (cut, up to next)
    with BuildSketch(Plane(origin=(0, 3, 0), x_dir=(1, 0, 0), z_dir=(0, 1, 0)), mode=Mode.PRIVATE) as cut_extrude_38_sk2:
        with Locations(Location((25.000820268, -37.552871048, 0), (0, 0, 270))):
            Circle(SKETCH_72_R)
    cut_extrude_38_tool2 = extrude(cut_extrude_38_sk2.sketch, amount=-CUT_EXTRUDE_38_REACH, mode=Mode.PRIVATE) & part.part
    add(cut_extrude_38_tool1.solids().sort_by_distance((-25.00082, 3, 37.552871))[0], mode=Mode.SUBTRACT)
    add(cut_extrude_38_tool2.solids().sort_by_distance((25.00082, 3, 37.552871))[0], mode=Mode.SUBTRACT)


solid = part.part
